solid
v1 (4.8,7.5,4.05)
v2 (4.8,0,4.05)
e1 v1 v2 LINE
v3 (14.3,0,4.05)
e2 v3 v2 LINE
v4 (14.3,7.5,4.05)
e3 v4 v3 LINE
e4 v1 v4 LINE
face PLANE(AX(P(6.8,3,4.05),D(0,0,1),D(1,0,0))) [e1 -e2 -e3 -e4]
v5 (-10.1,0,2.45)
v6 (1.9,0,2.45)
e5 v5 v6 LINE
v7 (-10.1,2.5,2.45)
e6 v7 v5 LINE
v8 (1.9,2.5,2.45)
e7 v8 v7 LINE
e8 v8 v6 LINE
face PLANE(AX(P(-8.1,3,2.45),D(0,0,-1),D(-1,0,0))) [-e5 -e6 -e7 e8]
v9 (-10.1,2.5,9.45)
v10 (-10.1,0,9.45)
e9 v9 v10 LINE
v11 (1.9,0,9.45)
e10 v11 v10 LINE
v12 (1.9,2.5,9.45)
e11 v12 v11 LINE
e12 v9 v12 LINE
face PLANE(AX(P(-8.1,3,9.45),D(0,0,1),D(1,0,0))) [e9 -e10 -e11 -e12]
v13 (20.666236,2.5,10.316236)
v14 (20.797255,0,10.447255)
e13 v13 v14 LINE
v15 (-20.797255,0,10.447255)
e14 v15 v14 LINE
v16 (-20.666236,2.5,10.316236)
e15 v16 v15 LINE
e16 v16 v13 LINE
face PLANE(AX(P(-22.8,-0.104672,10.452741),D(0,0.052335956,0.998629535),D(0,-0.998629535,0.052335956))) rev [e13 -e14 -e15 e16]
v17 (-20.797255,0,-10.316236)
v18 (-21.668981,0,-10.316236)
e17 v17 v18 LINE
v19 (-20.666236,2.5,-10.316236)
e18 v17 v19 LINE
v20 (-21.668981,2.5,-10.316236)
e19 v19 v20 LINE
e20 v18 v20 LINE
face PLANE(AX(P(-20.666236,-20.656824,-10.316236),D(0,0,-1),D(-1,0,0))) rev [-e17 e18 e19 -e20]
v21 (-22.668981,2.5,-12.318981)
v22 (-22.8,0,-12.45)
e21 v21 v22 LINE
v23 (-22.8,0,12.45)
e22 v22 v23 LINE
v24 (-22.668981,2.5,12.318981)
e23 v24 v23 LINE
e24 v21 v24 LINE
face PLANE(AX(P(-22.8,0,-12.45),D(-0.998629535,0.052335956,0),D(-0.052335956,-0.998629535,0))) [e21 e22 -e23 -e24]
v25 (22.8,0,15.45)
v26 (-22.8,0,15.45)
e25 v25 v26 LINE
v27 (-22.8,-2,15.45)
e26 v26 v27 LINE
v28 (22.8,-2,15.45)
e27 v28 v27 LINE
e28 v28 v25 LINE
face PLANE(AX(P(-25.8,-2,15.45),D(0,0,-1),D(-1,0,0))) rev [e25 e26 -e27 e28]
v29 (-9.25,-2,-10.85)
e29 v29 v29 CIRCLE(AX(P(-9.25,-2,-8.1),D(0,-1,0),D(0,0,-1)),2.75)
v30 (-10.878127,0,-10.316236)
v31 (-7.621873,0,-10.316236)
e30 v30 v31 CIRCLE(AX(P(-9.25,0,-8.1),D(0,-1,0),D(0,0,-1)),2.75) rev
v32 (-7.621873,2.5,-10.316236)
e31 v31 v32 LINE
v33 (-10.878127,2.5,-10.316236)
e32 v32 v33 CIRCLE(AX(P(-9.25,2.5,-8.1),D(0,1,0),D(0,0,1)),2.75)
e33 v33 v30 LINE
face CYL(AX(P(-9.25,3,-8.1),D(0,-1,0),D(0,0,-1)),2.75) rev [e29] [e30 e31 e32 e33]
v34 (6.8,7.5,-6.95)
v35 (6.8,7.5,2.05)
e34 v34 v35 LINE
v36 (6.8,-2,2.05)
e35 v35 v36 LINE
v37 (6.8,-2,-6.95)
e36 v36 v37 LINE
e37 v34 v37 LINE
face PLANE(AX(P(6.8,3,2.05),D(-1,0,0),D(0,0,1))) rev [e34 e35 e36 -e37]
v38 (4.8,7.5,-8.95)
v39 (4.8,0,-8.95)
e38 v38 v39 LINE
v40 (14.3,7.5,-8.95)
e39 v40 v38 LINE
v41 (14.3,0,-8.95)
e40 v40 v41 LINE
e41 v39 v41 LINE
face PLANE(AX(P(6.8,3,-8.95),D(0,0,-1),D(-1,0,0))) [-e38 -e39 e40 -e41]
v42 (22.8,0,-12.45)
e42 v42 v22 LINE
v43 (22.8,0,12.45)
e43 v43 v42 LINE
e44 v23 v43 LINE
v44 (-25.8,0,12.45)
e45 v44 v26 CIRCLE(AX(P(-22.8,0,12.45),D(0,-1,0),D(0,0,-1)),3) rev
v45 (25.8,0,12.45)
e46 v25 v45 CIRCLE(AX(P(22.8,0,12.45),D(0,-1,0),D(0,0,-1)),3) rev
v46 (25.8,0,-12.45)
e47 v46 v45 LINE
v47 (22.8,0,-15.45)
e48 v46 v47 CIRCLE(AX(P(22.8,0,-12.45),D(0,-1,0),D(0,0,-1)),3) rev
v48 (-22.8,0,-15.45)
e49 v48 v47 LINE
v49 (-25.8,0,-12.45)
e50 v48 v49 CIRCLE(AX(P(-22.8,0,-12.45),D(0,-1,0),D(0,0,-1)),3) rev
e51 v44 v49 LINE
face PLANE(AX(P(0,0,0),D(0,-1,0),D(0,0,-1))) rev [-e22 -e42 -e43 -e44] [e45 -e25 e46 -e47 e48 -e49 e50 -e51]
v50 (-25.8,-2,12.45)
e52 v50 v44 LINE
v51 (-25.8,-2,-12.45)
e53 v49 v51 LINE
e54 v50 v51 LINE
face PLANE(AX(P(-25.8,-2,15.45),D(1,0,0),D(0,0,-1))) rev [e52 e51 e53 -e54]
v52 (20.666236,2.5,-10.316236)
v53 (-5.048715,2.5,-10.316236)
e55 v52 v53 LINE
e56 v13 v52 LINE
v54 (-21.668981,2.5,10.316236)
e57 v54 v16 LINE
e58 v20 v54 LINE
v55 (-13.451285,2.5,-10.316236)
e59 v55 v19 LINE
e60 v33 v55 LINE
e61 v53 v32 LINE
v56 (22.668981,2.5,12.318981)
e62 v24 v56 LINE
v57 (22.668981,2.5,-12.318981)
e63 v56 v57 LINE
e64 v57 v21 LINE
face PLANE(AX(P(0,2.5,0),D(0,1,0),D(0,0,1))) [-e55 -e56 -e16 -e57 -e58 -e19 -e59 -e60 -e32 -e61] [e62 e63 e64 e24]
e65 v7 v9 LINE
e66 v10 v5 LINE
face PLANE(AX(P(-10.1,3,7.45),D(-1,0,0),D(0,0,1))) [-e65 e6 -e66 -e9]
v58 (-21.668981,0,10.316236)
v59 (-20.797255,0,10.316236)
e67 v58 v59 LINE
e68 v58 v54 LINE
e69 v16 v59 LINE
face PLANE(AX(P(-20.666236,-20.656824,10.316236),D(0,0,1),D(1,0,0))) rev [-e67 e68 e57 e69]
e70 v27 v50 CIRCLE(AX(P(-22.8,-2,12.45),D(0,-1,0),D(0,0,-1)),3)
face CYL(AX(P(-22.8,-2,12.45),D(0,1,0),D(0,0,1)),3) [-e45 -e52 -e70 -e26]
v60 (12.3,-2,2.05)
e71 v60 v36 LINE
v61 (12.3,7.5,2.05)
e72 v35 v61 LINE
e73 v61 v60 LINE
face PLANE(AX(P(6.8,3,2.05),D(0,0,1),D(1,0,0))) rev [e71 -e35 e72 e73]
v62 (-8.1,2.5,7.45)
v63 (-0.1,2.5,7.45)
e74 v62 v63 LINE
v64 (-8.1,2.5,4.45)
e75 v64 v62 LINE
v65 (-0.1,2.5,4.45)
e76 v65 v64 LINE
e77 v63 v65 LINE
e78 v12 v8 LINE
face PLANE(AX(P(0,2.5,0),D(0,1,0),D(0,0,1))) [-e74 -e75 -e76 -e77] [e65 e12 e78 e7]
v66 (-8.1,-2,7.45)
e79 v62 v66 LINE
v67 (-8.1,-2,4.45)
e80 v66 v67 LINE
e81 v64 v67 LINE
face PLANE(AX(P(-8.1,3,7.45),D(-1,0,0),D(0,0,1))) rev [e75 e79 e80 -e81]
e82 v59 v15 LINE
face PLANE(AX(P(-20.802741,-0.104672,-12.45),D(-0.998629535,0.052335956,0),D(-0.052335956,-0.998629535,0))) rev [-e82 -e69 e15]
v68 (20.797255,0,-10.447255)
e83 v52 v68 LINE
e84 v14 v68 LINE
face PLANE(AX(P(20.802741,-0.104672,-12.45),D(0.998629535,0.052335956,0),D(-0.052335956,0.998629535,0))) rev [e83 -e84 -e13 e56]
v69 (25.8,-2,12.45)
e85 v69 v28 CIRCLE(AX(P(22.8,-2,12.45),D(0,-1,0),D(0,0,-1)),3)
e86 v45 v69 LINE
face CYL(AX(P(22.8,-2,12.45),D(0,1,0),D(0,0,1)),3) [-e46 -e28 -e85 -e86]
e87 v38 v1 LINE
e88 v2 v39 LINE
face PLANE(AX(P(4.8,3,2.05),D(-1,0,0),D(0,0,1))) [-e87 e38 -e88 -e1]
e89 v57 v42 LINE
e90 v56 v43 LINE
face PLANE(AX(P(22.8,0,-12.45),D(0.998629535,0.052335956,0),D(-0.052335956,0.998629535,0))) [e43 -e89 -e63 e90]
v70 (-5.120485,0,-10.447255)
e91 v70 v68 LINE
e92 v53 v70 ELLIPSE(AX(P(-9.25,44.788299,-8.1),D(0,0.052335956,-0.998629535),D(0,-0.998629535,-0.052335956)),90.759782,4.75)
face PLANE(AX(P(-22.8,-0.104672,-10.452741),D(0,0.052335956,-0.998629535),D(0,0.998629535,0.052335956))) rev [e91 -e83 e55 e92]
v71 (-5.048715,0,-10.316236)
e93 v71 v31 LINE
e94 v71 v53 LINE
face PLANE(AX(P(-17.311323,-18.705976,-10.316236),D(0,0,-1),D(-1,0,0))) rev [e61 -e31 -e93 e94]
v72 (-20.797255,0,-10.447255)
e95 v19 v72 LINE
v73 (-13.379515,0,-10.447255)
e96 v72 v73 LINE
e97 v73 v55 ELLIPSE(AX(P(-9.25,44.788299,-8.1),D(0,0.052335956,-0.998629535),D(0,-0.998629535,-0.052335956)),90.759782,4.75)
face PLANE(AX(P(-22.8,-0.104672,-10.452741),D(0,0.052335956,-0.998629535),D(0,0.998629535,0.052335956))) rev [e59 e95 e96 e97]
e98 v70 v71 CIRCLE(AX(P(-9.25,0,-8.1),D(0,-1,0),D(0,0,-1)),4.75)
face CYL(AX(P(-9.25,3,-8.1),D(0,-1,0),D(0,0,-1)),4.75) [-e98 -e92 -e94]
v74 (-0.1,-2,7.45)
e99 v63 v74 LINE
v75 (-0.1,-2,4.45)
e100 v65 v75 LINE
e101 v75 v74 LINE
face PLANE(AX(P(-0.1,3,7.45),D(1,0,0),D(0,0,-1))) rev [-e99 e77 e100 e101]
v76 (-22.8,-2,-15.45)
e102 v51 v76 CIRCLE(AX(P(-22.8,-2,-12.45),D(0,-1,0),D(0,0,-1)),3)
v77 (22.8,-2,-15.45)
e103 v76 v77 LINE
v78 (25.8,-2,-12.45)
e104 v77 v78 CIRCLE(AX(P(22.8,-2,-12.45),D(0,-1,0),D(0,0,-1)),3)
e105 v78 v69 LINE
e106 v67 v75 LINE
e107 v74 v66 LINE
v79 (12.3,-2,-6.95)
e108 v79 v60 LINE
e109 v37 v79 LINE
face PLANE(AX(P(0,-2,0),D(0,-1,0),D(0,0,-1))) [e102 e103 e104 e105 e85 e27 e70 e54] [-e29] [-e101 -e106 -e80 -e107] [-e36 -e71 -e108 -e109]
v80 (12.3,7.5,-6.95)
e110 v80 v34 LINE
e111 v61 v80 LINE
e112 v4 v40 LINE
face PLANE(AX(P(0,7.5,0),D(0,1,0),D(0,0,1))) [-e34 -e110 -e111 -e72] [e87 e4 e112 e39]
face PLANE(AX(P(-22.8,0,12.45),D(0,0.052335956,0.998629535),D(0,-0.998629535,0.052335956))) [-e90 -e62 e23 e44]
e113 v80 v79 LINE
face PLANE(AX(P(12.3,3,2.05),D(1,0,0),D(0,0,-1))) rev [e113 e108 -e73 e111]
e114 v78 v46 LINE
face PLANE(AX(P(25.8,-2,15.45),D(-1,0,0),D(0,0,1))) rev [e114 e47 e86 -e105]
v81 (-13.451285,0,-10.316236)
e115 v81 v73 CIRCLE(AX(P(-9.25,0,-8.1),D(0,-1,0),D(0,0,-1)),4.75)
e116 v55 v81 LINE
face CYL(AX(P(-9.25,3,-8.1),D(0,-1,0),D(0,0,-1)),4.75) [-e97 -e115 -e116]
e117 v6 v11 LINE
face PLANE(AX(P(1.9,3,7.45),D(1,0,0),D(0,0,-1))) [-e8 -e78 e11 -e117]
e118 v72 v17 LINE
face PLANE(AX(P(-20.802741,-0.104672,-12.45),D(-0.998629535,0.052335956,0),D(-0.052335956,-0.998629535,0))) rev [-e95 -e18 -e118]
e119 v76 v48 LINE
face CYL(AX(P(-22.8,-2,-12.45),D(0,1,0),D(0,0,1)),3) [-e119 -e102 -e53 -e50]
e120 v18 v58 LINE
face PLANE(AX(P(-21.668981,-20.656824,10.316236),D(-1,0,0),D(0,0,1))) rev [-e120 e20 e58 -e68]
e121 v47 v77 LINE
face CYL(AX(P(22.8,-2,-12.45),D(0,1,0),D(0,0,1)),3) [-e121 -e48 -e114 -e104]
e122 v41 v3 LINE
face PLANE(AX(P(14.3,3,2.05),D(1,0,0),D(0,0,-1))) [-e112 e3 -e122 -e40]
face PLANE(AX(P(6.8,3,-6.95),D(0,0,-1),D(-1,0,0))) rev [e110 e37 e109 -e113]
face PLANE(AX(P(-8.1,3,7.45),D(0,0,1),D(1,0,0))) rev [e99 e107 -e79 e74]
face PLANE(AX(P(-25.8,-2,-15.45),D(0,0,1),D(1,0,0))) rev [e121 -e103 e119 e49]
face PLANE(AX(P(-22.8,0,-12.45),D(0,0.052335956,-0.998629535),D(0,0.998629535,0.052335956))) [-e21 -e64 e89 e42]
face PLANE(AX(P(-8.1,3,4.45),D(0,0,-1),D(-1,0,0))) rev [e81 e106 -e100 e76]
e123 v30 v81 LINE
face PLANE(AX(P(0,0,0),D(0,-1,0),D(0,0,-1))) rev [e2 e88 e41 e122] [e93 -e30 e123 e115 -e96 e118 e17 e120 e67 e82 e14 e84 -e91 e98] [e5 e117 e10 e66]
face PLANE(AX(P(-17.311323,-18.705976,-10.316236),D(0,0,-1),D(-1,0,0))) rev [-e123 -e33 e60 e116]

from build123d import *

# Parameters (mm, degrees)
CROQUIS1_W              = 45.6
CROQUIS1_H              = 24.9
SALIENTE_EXTRUIR1_DEPTH = 2.5
SALIENTE_EXTRUIR1_TAPER = 3
CROQUIS2_W              = 51.6
CROQUIS2_H              = 30.9
SALIENTE_EXTRUIR2_DEPTH = 2
REDONDEO1_R             = 3
CROQUIS3_R              = 2.75
CROQUIS3_W              = 8
CROQUIS3_H              = 3
CROQUIS3_W_2            = 5.5
CROQUIS3_H_2            = 9
CORTAR_EXTRUIR1_DEPTH   = 5
VACIADO1_START          = -10.447255308
VACIADO1_OUTLINE_W      = 2.9
VACIADO1_OUTLINE_H      = 2.5
VACIADO1_DEPTH          = 20.894510616
VACIADO1_2_OUTLINE_W    = 12
VACIADO1_2_OUTLINE_H    = 2.5
VACIADO1_2_DEPTH        = 12.897255308
VACIADO1_START_2        = 4.05
VACIADO1_3_OUTLINE_W    = 9.5
VACIADO1_3_OUTLINE_H    = 2.5
VACIADO1_3_DEPTH        = 6.397255308
VACIADO1_4_OUTLINE_W    = 9.5
VACIADO1_4_OUTLINE_H    = 2.5
VACIADO1_4_DEPTH        = 1.497255308
VACIADO1_START_3        = 9.45
VACIADO1_5_OUTLINE_W    = 12
VACIADO1_5_OUTLINE_H    = 2.5
VACIADO1_5_DEPTH        = 0.997255308
VACIADO1_START_4        = -7.073070686
VACIADO1_6_DEPTH        = 29.742051238
VACIADO1_START_5        = -22.668980552
VACIADO1_7_DEPTH        = 10.789333394
VACIADO1_START_6        = -12.0000001
VACIADO1_8_DEPTH        = 5.350388625
VACIADO1_9_DEPTH        = 2.5
CROQUIS4_W              = 1.002744692
CROQUIS4_H              = 20.63247172
CORTAR_EXTRUIR2_DEPTH   = 2.5
CROQUIS6_W              = 9.5
CROQUIS6_H              = 13
CROQUIS6_W_2            = 5.5
CROQUIS6_H_2            = 9
SALIENTE_EXTRUIR3_DEPTH = 5
CROQUIS7_W              = 15.957634565
CROQUIS7_H              = 9.76050456
CORTAR_EXTRUIR3_DEPTH   = 2.5


with BuildPart() as part:
    # Croquis1 → Saliente-Extruir1 (new body)
    with BuildSketch(Plane(origin=(0, 0, 0), x_dir=(1, 0, 0), z_dir=(0, 1, 0))):
        Rectangle(CROQUIS1_W, CROQUIS1_H)
    extrude(amount=SALIENTE_EXTRUIR1_DEPTH, taper=SALIENTE_EXTRUIR1_TAPER)

    # Croquis2 → Saliente-Extruir2 (add)
    with BuildSketch(Plane.XZ):
        Rectangle(CROQUIS2_W, CROQUIS2_H)
    extrude(amount=SALIENTE_EXTRUIR2_DEPTH)

    # Redondeo1
    redondeo1_edges = [part.edges().sort_by_distance(p)[0] for p in [
        (-25.8, -1, 15.45),
        (-25.8, -1, -15.45),
        (25.8, -1, -15.45),
        (25.8, -1, 15.45),
    ]]
    fillet(redondeo1_edges, radius=REDONDEO1_R)

    # Croquis3 → Cortar-Extruir1 (cut)
    with BuildSketch(Plane.XZ.offset(2)):
        with Locations(Location((-9.25, -8.1, 0), (0, 0, 270))):
            Circle(CROQUIS3_R)
        with Locations((-4.1, 5.95)):
            Rectangle(CROQUIS3_W, CROQUIS3_H)
        with Locations((9.55, -2.45)):
            Rectangle(CROQUIS3_W_2, CROQUIS3_H_2)
    extrude(amount=-CORTAR_EXTRUIR1_DEPTH, mode=Mode.SUBTRACT)

    # Vaciado1: read off the stored shape, not the designer's step
    # Vaciado1 outline → Vaciado1 (cut)
    with BuildSketch(Plane.XY.offset(VACIADO1_START)):
        Polygon((-20.66623586, 2.5), (-20.797255308, 0), (-10.1, 0), (-10.1, 2.5), align=None)
        with Locations((3.35, 1.25)):
            Rectangle(VACIADO1_OUTLINE_W, VACIADO1_OUTLINE_H)
        Polygon((14.3, 2.5), (14.3, 0), (20.797255308, 0), (20.66623586, 2.5), align=None)
    extrude(amount=VACIADO1_DEPTH, mode=Mode.SUBTRACT)

    # Vaciado1 2 outline → Vaciado1 2 (cut)
    with BuildSketch(Plane.XY.offset(VACIADO1_START)):
        with Locations((-4.1, 1.25)):
            Rectangle(VACIADO1_2_OUTLINE_W, VACIADO1_2_OUTLINE_H)
    extrude(amount=VACIADO1_2_DEPTH, mode=Mode.SUBTRACT)

    # Vaciado1 3 outline → Vaciado1 3 (cut)
    with BuildSketch(Plane.XY.offset(VACIADO1_START_2)):
        with Locations((9.55, 1.25)):
            Rectangle(VACIADO1_3_OUTLINE_W, VACIADO1_3_OUTLINE_H)
    extrude(amount=VACIADO1_3_DEPTH, mode=Mode.SUBTRACT)

    # Vaciado1 4 outline → Vaciado1 4 (cut)
    with BuildSketch(Plane.XY.offset(VACIADO1_START)):
        with Locations((9.55, 1.25)):
            Rectangle(VACIADO1_4_OUTLINE_W, VACIADO1_4_OUTLINE_H)
    extrude(amount=VACIADO1_4_DEPTH, mode=Mode.SUBTRACT)

    # Vaciado1 5 outline → Vaciado1 5 (cut)
    with BuildSketch(Plane.XY.offset(VACIADO1_START_3)):
        with Locations((-4.1, 1.25)):
            Rectangle(VACIADO1_5_OUTLINE_W, VACIADO1_5_OUTLINE_H)
    extrude(amount=VACIADO1_5_DEPTH, mode=Mode.SUBTRACT)

    # Vaciado1 6 outline → Vaciado1 6 (add)
    with BuildSketch(Plane.YZ.offset(VACIADO1_START_4)):
        Polygon((0, -10.447255308), (2.5, -10.447255308), (2.5, -10.31623586), align=None)
        Polygon((0, 10.447255308), (2.5, 10.31623586), (2.5, 10.447255308), align=None)
    extrude(amount=VACIADO1_6_DEPTH)

    # Vaciado1 7 outline → Vaciado1 7 (add)
    with BuildSketch(Plane.YZ.offset(VACIADO1_START_5)):
        Polygon((0, -10.447255308), (2.5, -10.447255308), (2.5, -10.31623586), align=None)
        Polygon((0, 10.447255308), (2.5, 10.31623586), (2.5, 10.447255308), align=None)
    extrude(amount=VACIADO1_7_DEPTH)

    # Vaciado1 8 outline → Vaciado1 8 (add)
    with BuildSketch(Plane.YZ.offset(VACIADO1_START_6)):
        Polygon((0, 10.447255308), (2.5, 10.31623586), (2.5, 10.447255308), align=None)
    extrude(amount=VACIADO1_8_DEPTH)

    # Vaciado1 9 outline → Vaciado1 9 (add)
    with BuildSketch(Plane(origin=(0, 0, 0), x_dir=(1, 0, 0), z_dir=(0, 1, 0))):
        with BuildLine():
            ThreePointArc((-7.817208138, 10.447255308), (-9.25, 5.35), (-10.682791862, 10.447255308))
            Line((-10.682791862, 10.447255308), (-13.379514804, 10.447255308))
            ThreePointArc((-13.379514804, 10.447255308), (-9.25, 3.35), (-5.120485196, 10.447255308))
            Line((-5.120485196, 10.447255308), (-7.817208138, 10.447255308))
        make_face()
    extrude(amount=VACIADO1_9_DEPTH)

    # Croquis4 → Cortar-Extruir2 (cut)
    with BuildSketch(Plane(origin=(0, 2.5, 0), x_dir=(1, 0, 0), z_dir=(0, 1, 0))):
        with Locations((-21.167608206, 0)):
            Rectangle(CROQUIS4_W, CROQUIS4_H)
    extrude(amount=-CORTAR_EXTRUIR2_DEPTH, mode=Mode.SUBTRACT)

    # Croquis6 → Saliente-Extruir3 (add)
    with BuildSketch(Plane(origin=(0, 2.5, 0), x_dir=(1, 0, 0), z_dir=(0, 1, 0))):
        with Locations((9.55, 2.45)):
            Rectangle(CROQUIS6_W, CROQUIS6_H)
        with Locations((9.55, 2.45)):
            Rectangle(CROQUIS6_W_2, CROQUIS6_H_2, mode=Mode.SUBTRACT)
    extrude(amount=SALIENTE_EXTRUIR3_DEPTH)

    # Croquis7 → Cortar-Extruir3 (cut)
    with BuildSketch(Plane(origin=(0, 2.5, 0), x_dir=(1, 0, 0), z_dir=(0, 1, 0))):
        with Locations((-9.332505864, 5.43598358)):
            Rectangle(CROQUIS7_W, CROQUIS7_H)
    extrude(amount=-CORTAR_EXTRUIR3_DEPTH, mode=Mode.SUBTRACT)


solid = part.part
